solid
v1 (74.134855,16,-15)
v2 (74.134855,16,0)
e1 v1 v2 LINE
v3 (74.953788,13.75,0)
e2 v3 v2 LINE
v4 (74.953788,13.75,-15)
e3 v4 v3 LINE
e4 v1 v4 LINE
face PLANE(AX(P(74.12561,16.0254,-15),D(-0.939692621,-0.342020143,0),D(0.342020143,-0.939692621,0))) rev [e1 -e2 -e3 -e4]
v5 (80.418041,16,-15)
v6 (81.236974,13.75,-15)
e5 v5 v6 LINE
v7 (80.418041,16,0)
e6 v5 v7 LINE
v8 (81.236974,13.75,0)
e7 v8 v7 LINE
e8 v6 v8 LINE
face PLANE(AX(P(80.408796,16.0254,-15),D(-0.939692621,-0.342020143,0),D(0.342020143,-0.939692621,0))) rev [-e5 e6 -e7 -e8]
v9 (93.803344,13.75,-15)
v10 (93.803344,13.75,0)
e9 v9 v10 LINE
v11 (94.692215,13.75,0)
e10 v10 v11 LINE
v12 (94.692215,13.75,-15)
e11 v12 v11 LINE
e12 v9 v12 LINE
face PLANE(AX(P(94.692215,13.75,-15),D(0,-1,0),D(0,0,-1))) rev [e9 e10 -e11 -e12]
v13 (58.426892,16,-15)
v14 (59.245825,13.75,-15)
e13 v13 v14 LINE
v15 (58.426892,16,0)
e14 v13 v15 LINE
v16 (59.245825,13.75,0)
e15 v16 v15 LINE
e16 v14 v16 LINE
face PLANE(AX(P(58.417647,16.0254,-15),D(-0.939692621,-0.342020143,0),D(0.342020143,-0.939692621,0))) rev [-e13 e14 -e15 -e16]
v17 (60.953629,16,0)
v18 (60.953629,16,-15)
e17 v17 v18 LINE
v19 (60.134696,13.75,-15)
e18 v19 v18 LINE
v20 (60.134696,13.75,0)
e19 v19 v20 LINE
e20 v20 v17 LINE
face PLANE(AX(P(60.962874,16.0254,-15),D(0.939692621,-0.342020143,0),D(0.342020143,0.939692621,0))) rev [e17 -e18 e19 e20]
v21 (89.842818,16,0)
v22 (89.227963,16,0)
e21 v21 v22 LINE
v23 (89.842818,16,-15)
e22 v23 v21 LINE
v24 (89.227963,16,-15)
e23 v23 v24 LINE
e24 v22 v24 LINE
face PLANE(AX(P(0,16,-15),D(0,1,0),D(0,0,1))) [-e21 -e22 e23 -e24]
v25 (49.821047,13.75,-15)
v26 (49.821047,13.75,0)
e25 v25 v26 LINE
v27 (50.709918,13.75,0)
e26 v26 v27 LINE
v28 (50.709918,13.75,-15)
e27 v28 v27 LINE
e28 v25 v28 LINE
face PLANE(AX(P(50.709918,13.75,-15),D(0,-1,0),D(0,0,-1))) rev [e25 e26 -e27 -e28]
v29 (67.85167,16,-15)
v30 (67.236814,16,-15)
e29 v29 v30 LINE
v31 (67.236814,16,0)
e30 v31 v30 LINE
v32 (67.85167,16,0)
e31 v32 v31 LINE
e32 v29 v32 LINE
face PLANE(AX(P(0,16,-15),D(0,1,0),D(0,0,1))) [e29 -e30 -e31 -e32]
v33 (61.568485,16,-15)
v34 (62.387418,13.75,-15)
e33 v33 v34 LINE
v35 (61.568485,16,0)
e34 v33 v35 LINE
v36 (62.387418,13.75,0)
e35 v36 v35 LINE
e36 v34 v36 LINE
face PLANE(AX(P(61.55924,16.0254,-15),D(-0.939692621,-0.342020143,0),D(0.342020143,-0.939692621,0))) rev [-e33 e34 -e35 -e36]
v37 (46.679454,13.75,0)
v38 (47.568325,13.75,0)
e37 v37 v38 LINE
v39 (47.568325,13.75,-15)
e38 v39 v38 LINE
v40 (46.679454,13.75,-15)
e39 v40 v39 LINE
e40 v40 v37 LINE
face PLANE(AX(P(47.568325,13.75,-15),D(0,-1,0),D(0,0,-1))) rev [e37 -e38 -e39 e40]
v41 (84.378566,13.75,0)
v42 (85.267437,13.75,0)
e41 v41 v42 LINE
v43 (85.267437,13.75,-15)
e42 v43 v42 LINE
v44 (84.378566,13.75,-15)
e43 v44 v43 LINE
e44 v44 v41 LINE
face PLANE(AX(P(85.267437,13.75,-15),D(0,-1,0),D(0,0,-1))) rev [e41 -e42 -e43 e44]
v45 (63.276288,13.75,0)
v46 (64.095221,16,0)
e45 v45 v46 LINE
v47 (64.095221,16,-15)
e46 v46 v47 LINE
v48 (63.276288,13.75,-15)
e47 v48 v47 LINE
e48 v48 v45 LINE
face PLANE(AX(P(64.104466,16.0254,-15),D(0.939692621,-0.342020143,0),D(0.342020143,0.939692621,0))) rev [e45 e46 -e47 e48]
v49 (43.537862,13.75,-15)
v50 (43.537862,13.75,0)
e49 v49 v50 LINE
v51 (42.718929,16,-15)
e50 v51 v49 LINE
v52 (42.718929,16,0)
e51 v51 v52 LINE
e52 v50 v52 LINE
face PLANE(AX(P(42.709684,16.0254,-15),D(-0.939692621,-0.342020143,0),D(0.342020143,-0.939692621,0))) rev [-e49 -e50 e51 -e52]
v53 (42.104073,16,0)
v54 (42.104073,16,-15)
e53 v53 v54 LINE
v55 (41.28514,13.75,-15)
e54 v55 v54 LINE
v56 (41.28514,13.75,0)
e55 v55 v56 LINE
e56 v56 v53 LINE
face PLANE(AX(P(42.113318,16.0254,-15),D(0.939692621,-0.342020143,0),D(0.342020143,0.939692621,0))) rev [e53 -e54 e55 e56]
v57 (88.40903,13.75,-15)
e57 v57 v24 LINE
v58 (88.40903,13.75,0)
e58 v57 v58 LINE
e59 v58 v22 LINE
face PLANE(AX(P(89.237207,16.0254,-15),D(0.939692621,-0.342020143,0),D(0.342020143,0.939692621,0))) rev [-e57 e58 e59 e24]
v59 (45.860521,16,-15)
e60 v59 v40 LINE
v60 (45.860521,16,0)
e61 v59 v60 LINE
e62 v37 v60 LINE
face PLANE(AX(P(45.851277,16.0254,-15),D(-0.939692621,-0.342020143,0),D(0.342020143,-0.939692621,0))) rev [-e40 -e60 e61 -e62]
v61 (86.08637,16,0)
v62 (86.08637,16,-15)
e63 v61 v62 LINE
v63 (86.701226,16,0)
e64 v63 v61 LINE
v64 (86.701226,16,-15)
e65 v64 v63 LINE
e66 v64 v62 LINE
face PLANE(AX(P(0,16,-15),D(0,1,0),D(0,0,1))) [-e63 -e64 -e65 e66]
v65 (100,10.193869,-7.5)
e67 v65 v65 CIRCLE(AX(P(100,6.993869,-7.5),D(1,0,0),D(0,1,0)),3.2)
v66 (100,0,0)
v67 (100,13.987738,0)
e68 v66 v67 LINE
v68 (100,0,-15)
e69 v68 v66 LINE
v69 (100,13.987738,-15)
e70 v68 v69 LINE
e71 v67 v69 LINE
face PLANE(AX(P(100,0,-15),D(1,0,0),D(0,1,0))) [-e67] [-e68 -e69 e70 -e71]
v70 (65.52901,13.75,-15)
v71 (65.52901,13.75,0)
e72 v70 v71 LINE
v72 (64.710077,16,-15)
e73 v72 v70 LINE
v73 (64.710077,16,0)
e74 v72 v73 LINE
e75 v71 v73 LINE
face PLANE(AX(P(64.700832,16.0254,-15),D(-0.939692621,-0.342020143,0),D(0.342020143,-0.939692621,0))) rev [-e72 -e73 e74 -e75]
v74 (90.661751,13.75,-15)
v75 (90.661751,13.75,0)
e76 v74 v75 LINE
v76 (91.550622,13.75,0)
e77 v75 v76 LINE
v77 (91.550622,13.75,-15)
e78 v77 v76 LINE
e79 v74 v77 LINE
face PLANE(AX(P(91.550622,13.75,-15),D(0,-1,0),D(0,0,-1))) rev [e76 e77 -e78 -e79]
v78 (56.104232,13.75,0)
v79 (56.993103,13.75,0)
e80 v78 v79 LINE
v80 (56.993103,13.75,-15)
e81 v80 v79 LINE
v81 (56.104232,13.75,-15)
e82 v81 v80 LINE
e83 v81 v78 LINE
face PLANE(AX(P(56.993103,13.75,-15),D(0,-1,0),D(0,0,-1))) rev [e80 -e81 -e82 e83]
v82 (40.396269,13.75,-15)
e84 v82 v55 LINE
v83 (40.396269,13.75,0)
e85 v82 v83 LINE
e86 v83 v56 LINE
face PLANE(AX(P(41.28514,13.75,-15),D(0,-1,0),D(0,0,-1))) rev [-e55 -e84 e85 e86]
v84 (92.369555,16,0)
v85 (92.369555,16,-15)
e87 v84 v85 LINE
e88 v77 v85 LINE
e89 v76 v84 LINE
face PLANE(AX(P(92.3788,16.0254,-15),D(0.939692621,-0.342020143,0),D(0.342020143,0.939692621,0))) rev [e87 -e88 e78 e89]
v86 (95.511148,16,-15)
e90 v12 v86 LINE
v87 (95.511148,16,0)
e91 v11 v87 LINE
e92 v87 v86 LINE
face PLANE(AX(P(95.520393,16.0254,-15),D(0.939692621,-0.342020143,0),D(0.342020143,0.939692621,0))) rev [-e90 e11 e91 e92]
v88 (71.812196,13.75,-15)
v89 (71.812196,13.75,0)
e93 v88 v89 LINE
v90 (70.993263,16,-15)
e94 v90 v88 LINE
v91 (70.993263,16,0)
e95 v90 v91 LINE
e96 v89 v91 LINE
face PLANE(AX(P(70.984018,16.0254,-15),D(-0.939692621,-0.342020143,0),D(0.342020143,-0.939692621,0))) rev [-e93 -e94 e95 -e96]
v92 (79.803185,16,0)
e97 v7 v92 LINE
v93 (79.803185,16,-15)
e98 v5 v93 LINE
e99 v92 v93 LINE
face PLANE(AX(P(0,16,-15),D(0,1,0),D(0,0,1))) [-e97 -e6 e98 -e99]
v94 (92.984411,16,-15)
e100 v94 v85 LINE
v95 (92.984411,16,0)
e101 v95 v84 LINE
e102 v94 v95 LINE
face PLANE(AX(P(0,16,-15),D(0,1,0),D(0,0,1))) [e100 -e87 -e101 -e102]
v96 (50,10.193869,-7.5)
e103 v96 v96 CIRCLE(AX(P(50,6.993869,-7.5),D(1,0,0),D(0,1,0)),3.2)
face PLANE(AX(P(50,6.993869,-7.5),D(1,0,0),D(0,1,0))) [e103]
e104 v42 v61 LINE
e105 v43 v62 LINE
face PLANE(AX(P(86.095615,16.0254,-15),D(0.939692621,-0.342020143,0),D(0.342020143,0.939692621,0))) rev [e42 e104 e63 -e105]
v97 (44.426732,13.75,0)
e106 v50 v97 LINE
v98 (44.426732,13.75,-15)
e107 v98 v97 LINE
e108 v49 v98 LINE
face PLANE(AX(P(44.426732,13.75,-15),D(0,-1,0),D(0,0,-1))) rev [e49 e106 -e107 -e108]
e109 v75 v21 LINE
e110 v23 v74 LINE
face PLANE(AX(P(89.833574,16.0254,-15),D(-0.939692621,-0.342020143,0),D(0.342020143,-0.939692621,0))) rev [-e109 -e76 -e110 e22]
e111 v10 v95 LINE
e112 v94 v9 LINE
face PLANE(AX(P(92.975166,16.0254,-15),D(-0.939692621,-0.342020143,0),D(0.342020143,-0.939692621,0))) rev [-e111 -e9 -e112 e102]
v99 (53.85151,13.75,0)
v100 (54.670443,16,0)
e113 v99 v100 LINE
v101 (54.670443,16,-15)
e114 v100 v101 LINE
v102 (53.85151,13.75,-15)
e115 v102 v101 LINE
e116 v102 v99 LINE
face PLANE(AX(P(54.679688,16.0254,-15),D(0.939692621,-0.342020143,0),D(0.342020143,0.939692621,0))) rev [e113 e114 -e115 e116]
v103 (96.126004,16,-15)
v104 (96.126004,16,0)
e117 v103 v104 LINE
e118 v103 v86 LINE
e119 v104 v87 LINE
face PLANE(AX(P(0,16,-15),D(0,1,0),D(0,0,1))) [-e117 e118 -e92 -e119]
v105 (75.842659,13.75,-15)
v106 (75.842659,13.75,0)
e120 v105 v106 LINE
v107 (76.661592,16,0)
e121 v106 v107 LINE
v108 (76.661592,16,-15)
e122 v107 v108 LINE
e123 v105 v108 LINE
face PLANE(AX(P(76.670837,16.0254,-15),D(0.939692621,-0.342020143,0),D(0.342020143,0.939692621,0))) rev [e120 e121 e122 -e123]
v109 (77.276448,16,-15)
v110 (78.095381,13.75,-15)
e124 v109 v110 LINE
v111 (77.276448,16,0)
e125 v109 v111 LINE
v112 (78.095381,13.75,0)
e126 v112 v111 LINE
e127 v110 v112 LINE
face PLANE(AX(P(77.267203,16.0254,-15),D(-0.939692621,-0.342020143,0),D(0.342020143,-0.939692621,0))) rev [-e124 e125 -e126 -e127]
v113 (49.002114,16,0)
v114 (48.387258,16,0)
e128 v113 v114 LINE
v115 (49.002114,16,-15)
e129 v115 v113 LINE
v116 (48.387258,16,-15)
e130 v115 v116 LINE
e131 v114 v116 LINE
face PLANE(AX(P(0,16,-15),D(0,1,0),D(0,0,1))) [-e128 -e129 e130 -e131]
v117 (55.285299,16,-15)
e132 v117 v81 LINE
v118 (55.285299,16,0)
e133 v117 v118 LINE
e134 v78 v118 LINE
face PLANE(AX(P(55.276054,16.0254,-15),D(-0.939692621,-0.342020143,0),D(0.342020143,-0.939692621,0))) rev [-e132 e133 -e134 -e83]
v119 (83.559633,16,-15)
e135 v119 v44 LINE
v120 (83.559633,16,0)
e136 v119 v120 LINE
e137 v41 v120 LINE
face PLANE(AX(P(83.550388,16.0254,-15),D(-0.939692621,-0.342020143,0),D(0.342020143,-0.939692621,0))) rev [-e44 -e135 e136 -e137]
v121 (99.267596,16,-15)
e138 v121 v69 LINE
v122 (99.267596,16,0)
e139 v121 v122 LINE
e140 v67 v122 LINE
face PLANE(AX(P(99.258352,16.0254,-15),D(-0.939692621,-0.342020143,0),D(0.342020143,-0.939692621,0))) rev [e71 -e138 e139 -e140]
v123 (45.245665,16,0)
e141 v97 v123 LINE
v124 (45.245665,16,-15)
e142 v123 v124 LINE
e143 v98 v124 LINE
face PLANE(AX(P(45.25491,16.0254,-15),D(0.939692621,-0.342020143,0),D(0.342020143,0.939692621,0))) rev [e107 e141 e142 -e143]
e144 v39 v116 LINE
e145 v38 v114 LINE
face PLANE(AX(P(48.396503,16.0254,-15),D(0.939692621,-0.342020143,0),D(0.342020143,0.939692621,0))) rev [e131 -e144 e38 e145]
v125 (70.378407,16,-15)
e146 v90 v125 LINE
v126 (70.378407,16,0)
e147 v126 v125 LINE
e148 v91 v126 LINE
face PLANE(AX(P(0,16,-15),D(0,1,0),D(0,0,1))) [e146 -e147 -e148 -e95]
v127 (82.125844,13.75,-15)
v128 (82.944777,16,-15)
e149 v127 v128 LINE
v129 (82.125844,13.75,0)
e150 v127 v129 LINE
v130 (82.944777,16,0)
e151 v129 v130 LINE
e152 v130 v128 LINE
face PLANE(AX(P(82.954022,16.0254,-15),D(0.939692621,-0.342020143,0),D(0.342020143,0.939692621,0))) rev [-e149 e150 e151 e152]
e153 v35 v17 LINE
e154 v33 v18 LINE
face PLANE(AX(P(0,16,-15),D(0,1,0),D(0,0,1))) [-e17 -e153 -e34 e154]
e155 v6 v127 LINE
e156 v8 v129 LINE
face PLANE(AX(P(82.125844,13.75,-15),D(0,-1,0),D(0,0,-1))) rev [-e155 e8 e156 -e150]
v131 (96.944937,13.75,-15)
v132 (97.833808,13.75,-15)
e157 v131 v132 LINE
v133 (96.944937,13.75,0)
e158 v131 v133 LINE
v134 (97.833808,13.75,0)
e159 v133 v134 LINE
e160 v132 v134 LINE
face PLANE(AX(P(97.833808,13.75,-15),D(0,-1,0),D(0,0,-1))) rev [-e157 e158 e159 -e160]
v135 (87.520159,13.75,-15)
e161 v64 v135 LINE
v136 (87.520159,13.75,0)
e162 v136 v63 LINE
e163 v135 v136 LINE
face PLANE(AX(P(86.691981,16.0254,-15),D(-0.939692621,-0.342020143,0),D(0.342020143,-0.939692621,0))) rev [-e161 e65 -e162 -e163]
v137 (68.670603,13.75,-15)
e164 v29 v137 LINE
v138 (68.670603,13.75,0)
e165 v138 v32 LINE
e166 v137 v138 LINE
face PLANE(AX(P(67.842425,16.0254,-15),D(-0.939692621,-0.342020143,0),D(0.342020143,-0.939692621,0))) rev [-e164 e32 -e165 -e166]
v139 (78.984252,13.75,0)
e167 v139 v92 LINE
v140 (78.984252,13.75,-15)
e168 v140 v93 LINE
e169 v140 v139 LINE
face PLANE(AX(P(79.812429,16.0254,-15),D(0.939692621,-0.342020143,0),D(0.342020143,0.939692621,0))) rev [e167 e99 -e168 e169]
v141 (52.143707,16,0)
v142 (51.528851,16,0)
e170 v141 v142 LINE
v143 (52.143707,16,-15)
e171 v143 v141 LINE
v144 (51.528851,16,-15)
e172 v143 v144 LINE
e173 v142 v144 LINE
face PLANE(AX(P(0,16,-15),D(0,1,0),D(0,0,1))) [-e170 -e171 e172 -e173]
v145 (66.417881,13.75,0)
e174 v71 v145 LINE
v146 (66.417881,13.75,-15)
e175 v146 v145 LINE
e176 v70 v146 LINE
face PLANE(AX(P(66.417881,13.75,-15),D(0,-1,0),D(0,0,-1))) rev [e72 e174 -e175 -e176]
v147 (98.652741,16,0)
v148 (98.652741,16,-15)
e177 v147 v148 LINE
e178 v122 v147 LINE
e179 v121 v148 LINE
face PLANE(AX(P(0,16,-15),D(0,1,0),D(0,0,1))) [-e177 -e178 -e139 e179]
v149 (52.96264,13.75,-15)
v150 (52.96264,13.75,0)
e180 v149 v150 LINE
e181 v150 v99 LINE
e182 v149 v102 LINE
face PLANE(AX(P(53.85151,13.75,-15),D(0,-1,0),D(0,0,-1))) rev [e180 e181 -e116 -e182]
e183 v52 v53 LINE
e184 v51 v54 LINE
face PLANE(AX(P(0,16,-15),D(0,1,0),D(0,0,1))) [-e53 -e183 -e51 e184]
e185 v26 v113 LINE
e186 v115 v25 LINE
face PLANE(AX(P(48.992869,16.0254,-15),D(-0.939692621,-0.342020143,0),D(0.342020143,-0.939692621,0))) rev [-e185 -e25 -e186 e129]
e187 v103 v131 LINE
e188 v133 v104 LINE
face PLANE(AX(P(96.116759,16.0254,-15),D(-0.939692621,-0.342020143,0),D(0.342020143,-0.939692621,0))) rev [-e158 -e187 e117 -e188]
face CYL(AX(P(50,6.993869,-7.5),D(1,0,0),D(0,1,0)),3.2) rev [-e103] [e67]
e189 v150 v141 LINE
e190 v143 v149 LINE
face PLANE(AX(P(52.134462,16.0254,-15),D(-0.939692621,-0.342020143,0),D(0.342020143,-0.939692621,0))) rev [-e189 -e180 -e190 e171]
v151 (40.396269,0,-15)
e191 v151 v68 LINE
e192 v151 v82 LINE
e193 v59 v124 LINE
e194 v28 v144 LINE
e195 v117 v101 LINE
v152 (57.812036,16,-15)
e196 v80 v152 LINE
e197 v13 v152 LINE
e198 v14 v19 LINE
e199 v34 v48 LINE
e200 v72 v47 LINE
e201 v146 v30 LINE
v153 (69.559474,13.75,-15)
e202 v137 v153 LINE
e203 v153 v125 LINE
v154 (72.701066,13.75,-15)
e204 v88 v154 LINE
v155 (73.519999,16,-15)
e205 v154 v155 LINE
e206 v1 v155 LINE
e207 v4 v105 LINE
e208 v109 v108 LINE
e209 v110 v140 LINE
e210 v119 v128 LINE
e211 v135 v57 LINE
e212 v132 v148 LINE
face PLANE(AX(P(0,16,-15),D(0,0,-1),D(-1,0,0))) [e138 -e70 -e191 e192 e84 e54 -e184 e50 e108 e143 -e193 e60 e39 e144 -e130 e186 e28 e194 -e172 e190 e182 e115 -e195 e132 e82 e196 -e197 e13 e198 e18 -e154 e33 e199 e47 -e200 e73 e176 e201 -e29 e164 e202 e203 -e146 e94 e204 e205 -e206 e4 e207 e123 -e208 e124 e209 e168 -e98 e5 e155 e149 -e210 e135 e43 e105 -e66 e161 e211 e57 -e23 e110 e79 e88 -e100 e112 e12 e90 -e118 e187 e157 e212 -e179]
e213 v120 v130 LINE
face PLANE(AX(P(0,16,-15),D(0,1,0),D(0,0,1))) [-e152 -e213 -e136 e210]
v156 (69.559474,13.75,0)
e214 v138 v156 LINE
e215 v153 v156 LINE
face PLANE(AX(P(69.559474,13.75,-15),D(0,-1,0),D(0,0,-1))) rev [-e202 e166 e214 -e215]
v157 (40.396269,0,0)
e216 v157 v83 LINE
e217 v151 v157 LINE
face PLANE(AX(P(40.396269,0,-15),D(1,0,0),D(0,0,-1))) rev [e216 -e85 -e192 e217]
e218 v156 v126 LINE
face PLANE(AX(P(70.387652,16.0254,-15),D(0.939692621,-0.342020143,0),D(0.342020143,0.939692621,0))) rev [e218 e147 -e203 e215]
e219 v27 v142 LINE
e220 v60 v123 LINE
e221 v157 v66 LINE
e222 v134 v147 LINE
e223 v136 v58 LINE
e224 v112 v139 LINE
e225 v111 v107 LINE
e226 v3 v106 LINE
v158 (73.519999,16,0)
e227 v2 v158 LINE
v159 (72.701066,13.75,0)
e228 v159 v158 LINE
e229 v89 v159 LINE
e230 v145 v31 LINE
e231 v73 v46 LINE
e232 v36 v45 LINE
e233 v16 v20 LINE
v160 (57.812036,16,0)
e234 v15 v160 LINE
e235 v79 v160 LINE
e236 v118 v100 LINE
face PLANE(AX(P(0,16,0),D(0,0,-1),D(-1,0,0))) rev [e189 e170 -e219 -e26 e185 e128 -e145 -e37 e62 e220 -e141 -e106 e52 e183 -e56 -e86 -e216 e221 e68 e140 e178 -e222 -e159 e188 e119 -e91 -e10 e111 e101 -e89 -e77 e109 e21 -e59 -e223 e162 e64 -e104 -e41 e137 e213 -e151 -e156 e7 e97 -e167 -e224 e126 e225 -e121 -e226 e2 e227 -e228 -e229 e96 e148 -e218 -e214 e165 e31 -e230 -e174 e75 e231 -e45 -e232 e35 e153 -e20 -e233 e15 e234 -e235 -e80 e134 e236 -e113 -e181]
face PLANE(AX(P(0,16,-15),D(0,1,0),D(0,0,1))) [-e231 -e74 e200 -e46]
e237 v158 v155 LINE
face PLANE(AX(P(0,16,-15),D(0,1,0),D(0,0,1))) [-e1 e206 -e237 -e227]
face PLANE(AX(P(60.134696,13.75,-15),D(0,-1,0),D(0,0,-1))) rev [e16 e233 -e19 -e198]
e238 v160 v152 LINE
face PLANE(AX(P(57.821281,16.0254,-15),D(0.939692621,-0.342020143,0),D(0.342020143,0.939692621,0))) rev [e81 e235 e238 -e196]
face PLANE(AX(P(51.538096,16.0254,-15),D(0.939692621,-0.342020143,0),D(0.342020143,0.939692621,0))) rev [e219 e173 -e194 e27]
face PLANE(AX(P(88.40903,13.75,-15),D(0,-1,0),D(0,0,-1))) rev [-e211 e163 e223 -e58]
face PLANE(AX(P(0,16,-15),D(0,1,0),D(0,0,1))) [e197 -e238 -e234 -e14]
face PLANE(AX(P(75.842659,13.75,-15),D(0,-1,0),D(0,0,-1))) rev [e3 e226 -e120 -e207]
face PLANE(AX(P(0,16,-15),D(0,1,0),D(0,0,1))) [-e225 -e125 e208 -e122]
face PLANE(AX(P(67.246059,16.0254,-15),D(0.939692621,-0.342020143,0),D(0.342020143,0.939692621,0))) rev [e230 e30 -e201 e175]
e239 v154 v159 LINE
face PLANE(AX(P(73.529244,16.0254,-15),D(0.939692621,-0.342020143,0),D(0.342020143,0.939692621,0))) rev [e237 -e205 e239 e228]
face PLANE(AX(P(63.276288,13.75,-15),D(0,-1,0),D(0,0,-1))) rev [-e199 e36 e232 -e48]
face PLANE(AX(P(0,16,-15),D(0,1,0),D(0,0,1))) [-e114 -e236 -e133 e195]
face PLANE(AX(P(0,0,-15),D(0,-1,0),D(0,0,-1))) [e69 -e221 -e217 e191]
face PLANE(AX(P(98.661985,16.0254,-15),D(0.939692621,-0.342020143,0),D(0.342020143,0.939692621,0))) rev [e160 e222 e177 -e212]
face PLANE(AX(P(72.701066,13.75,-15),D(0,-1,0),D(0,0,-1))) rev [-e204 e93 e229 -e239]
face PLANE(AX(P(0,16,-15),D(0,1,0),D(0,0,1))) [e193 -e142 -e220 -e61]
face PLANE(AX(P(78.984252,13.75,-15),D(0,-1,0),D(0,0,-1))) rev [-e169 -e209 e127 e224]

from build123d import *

# Parameters (mm, degrees)
BLANKSKE_W         = 100
BLANKSKE_H         = 16
BLANK_DEPTH        = 15
TOOTHCUTSIM_DEPTH  = 103.376755174
TEETHCUTS_COUNT    = 33
TEETHCUTS_PITCH    = 3.14159265
SKETCH1_R          = 3.2
CUT_EXTRUDE1_DEPTH = 50
SKETCH2_W          = 40.39626908
SKETCH2_H          = 26.250089156
CUT_EXTRUDE2_DEPTH = 103.376755174


with BuildPart() as part:
    # BlankSke → Blank (new body)
    with BuildSketch(Plane.XY):
        with Locations((50, 8)):
            Rectangle(BLANKSKE_W, BLANKSKE_H)
    extrude(amount=-BLANK_DEPTH)

    # TooCutSkeSim → ToothCutSim (cut, through all)
    with BuildSketch(Plane.XY):
        Polygon((0.44443537, 13.75), (-0.44443537, 13.75), (-1.272613241, 16.0254), (1.272613241, 16.0254), align=None)
    toothcutsim = extrude(amount=-TOOTHCUTSIM_DEPTH, mode=Mode.SUBTRACT)

    # TeethCuts: ToothCutSim ×33
    with Locations(*[(i * TEETHCUTS_PITCH, 0, 0) for i in range(1, TEETHCUTS_COUNT)]):
        add(toothcutsim, mode=Mode.SUBTRACT)

    # Sketch1 → Cut-Extrude1 (cut)
    with BuildSketch(Plane(origin=(100, 0, 0), x_dir=(0, 0, -1), z_dir=(1, 0, 0))):
        with Locations((7.5, 6.993868828)):
            Circle(SKETCH1_R)
    extrude(amount=-CUT_EXTRUDE1_DEPTH, mode=Mode.SUBTRACT)

    # Sketch2 → Cut-Extrude2 (cut, through all)
    with BuildSketch(Plane.XY):
        with Locations((20.19813454, 13.125044578)):
            Rectangle(SKETCH2_W, SKETCH2_H)
    extrude(amount=-CUT_EXTRUDE2_DEPTH, mode=Mode.SUBTRACT)


solid = part.part
